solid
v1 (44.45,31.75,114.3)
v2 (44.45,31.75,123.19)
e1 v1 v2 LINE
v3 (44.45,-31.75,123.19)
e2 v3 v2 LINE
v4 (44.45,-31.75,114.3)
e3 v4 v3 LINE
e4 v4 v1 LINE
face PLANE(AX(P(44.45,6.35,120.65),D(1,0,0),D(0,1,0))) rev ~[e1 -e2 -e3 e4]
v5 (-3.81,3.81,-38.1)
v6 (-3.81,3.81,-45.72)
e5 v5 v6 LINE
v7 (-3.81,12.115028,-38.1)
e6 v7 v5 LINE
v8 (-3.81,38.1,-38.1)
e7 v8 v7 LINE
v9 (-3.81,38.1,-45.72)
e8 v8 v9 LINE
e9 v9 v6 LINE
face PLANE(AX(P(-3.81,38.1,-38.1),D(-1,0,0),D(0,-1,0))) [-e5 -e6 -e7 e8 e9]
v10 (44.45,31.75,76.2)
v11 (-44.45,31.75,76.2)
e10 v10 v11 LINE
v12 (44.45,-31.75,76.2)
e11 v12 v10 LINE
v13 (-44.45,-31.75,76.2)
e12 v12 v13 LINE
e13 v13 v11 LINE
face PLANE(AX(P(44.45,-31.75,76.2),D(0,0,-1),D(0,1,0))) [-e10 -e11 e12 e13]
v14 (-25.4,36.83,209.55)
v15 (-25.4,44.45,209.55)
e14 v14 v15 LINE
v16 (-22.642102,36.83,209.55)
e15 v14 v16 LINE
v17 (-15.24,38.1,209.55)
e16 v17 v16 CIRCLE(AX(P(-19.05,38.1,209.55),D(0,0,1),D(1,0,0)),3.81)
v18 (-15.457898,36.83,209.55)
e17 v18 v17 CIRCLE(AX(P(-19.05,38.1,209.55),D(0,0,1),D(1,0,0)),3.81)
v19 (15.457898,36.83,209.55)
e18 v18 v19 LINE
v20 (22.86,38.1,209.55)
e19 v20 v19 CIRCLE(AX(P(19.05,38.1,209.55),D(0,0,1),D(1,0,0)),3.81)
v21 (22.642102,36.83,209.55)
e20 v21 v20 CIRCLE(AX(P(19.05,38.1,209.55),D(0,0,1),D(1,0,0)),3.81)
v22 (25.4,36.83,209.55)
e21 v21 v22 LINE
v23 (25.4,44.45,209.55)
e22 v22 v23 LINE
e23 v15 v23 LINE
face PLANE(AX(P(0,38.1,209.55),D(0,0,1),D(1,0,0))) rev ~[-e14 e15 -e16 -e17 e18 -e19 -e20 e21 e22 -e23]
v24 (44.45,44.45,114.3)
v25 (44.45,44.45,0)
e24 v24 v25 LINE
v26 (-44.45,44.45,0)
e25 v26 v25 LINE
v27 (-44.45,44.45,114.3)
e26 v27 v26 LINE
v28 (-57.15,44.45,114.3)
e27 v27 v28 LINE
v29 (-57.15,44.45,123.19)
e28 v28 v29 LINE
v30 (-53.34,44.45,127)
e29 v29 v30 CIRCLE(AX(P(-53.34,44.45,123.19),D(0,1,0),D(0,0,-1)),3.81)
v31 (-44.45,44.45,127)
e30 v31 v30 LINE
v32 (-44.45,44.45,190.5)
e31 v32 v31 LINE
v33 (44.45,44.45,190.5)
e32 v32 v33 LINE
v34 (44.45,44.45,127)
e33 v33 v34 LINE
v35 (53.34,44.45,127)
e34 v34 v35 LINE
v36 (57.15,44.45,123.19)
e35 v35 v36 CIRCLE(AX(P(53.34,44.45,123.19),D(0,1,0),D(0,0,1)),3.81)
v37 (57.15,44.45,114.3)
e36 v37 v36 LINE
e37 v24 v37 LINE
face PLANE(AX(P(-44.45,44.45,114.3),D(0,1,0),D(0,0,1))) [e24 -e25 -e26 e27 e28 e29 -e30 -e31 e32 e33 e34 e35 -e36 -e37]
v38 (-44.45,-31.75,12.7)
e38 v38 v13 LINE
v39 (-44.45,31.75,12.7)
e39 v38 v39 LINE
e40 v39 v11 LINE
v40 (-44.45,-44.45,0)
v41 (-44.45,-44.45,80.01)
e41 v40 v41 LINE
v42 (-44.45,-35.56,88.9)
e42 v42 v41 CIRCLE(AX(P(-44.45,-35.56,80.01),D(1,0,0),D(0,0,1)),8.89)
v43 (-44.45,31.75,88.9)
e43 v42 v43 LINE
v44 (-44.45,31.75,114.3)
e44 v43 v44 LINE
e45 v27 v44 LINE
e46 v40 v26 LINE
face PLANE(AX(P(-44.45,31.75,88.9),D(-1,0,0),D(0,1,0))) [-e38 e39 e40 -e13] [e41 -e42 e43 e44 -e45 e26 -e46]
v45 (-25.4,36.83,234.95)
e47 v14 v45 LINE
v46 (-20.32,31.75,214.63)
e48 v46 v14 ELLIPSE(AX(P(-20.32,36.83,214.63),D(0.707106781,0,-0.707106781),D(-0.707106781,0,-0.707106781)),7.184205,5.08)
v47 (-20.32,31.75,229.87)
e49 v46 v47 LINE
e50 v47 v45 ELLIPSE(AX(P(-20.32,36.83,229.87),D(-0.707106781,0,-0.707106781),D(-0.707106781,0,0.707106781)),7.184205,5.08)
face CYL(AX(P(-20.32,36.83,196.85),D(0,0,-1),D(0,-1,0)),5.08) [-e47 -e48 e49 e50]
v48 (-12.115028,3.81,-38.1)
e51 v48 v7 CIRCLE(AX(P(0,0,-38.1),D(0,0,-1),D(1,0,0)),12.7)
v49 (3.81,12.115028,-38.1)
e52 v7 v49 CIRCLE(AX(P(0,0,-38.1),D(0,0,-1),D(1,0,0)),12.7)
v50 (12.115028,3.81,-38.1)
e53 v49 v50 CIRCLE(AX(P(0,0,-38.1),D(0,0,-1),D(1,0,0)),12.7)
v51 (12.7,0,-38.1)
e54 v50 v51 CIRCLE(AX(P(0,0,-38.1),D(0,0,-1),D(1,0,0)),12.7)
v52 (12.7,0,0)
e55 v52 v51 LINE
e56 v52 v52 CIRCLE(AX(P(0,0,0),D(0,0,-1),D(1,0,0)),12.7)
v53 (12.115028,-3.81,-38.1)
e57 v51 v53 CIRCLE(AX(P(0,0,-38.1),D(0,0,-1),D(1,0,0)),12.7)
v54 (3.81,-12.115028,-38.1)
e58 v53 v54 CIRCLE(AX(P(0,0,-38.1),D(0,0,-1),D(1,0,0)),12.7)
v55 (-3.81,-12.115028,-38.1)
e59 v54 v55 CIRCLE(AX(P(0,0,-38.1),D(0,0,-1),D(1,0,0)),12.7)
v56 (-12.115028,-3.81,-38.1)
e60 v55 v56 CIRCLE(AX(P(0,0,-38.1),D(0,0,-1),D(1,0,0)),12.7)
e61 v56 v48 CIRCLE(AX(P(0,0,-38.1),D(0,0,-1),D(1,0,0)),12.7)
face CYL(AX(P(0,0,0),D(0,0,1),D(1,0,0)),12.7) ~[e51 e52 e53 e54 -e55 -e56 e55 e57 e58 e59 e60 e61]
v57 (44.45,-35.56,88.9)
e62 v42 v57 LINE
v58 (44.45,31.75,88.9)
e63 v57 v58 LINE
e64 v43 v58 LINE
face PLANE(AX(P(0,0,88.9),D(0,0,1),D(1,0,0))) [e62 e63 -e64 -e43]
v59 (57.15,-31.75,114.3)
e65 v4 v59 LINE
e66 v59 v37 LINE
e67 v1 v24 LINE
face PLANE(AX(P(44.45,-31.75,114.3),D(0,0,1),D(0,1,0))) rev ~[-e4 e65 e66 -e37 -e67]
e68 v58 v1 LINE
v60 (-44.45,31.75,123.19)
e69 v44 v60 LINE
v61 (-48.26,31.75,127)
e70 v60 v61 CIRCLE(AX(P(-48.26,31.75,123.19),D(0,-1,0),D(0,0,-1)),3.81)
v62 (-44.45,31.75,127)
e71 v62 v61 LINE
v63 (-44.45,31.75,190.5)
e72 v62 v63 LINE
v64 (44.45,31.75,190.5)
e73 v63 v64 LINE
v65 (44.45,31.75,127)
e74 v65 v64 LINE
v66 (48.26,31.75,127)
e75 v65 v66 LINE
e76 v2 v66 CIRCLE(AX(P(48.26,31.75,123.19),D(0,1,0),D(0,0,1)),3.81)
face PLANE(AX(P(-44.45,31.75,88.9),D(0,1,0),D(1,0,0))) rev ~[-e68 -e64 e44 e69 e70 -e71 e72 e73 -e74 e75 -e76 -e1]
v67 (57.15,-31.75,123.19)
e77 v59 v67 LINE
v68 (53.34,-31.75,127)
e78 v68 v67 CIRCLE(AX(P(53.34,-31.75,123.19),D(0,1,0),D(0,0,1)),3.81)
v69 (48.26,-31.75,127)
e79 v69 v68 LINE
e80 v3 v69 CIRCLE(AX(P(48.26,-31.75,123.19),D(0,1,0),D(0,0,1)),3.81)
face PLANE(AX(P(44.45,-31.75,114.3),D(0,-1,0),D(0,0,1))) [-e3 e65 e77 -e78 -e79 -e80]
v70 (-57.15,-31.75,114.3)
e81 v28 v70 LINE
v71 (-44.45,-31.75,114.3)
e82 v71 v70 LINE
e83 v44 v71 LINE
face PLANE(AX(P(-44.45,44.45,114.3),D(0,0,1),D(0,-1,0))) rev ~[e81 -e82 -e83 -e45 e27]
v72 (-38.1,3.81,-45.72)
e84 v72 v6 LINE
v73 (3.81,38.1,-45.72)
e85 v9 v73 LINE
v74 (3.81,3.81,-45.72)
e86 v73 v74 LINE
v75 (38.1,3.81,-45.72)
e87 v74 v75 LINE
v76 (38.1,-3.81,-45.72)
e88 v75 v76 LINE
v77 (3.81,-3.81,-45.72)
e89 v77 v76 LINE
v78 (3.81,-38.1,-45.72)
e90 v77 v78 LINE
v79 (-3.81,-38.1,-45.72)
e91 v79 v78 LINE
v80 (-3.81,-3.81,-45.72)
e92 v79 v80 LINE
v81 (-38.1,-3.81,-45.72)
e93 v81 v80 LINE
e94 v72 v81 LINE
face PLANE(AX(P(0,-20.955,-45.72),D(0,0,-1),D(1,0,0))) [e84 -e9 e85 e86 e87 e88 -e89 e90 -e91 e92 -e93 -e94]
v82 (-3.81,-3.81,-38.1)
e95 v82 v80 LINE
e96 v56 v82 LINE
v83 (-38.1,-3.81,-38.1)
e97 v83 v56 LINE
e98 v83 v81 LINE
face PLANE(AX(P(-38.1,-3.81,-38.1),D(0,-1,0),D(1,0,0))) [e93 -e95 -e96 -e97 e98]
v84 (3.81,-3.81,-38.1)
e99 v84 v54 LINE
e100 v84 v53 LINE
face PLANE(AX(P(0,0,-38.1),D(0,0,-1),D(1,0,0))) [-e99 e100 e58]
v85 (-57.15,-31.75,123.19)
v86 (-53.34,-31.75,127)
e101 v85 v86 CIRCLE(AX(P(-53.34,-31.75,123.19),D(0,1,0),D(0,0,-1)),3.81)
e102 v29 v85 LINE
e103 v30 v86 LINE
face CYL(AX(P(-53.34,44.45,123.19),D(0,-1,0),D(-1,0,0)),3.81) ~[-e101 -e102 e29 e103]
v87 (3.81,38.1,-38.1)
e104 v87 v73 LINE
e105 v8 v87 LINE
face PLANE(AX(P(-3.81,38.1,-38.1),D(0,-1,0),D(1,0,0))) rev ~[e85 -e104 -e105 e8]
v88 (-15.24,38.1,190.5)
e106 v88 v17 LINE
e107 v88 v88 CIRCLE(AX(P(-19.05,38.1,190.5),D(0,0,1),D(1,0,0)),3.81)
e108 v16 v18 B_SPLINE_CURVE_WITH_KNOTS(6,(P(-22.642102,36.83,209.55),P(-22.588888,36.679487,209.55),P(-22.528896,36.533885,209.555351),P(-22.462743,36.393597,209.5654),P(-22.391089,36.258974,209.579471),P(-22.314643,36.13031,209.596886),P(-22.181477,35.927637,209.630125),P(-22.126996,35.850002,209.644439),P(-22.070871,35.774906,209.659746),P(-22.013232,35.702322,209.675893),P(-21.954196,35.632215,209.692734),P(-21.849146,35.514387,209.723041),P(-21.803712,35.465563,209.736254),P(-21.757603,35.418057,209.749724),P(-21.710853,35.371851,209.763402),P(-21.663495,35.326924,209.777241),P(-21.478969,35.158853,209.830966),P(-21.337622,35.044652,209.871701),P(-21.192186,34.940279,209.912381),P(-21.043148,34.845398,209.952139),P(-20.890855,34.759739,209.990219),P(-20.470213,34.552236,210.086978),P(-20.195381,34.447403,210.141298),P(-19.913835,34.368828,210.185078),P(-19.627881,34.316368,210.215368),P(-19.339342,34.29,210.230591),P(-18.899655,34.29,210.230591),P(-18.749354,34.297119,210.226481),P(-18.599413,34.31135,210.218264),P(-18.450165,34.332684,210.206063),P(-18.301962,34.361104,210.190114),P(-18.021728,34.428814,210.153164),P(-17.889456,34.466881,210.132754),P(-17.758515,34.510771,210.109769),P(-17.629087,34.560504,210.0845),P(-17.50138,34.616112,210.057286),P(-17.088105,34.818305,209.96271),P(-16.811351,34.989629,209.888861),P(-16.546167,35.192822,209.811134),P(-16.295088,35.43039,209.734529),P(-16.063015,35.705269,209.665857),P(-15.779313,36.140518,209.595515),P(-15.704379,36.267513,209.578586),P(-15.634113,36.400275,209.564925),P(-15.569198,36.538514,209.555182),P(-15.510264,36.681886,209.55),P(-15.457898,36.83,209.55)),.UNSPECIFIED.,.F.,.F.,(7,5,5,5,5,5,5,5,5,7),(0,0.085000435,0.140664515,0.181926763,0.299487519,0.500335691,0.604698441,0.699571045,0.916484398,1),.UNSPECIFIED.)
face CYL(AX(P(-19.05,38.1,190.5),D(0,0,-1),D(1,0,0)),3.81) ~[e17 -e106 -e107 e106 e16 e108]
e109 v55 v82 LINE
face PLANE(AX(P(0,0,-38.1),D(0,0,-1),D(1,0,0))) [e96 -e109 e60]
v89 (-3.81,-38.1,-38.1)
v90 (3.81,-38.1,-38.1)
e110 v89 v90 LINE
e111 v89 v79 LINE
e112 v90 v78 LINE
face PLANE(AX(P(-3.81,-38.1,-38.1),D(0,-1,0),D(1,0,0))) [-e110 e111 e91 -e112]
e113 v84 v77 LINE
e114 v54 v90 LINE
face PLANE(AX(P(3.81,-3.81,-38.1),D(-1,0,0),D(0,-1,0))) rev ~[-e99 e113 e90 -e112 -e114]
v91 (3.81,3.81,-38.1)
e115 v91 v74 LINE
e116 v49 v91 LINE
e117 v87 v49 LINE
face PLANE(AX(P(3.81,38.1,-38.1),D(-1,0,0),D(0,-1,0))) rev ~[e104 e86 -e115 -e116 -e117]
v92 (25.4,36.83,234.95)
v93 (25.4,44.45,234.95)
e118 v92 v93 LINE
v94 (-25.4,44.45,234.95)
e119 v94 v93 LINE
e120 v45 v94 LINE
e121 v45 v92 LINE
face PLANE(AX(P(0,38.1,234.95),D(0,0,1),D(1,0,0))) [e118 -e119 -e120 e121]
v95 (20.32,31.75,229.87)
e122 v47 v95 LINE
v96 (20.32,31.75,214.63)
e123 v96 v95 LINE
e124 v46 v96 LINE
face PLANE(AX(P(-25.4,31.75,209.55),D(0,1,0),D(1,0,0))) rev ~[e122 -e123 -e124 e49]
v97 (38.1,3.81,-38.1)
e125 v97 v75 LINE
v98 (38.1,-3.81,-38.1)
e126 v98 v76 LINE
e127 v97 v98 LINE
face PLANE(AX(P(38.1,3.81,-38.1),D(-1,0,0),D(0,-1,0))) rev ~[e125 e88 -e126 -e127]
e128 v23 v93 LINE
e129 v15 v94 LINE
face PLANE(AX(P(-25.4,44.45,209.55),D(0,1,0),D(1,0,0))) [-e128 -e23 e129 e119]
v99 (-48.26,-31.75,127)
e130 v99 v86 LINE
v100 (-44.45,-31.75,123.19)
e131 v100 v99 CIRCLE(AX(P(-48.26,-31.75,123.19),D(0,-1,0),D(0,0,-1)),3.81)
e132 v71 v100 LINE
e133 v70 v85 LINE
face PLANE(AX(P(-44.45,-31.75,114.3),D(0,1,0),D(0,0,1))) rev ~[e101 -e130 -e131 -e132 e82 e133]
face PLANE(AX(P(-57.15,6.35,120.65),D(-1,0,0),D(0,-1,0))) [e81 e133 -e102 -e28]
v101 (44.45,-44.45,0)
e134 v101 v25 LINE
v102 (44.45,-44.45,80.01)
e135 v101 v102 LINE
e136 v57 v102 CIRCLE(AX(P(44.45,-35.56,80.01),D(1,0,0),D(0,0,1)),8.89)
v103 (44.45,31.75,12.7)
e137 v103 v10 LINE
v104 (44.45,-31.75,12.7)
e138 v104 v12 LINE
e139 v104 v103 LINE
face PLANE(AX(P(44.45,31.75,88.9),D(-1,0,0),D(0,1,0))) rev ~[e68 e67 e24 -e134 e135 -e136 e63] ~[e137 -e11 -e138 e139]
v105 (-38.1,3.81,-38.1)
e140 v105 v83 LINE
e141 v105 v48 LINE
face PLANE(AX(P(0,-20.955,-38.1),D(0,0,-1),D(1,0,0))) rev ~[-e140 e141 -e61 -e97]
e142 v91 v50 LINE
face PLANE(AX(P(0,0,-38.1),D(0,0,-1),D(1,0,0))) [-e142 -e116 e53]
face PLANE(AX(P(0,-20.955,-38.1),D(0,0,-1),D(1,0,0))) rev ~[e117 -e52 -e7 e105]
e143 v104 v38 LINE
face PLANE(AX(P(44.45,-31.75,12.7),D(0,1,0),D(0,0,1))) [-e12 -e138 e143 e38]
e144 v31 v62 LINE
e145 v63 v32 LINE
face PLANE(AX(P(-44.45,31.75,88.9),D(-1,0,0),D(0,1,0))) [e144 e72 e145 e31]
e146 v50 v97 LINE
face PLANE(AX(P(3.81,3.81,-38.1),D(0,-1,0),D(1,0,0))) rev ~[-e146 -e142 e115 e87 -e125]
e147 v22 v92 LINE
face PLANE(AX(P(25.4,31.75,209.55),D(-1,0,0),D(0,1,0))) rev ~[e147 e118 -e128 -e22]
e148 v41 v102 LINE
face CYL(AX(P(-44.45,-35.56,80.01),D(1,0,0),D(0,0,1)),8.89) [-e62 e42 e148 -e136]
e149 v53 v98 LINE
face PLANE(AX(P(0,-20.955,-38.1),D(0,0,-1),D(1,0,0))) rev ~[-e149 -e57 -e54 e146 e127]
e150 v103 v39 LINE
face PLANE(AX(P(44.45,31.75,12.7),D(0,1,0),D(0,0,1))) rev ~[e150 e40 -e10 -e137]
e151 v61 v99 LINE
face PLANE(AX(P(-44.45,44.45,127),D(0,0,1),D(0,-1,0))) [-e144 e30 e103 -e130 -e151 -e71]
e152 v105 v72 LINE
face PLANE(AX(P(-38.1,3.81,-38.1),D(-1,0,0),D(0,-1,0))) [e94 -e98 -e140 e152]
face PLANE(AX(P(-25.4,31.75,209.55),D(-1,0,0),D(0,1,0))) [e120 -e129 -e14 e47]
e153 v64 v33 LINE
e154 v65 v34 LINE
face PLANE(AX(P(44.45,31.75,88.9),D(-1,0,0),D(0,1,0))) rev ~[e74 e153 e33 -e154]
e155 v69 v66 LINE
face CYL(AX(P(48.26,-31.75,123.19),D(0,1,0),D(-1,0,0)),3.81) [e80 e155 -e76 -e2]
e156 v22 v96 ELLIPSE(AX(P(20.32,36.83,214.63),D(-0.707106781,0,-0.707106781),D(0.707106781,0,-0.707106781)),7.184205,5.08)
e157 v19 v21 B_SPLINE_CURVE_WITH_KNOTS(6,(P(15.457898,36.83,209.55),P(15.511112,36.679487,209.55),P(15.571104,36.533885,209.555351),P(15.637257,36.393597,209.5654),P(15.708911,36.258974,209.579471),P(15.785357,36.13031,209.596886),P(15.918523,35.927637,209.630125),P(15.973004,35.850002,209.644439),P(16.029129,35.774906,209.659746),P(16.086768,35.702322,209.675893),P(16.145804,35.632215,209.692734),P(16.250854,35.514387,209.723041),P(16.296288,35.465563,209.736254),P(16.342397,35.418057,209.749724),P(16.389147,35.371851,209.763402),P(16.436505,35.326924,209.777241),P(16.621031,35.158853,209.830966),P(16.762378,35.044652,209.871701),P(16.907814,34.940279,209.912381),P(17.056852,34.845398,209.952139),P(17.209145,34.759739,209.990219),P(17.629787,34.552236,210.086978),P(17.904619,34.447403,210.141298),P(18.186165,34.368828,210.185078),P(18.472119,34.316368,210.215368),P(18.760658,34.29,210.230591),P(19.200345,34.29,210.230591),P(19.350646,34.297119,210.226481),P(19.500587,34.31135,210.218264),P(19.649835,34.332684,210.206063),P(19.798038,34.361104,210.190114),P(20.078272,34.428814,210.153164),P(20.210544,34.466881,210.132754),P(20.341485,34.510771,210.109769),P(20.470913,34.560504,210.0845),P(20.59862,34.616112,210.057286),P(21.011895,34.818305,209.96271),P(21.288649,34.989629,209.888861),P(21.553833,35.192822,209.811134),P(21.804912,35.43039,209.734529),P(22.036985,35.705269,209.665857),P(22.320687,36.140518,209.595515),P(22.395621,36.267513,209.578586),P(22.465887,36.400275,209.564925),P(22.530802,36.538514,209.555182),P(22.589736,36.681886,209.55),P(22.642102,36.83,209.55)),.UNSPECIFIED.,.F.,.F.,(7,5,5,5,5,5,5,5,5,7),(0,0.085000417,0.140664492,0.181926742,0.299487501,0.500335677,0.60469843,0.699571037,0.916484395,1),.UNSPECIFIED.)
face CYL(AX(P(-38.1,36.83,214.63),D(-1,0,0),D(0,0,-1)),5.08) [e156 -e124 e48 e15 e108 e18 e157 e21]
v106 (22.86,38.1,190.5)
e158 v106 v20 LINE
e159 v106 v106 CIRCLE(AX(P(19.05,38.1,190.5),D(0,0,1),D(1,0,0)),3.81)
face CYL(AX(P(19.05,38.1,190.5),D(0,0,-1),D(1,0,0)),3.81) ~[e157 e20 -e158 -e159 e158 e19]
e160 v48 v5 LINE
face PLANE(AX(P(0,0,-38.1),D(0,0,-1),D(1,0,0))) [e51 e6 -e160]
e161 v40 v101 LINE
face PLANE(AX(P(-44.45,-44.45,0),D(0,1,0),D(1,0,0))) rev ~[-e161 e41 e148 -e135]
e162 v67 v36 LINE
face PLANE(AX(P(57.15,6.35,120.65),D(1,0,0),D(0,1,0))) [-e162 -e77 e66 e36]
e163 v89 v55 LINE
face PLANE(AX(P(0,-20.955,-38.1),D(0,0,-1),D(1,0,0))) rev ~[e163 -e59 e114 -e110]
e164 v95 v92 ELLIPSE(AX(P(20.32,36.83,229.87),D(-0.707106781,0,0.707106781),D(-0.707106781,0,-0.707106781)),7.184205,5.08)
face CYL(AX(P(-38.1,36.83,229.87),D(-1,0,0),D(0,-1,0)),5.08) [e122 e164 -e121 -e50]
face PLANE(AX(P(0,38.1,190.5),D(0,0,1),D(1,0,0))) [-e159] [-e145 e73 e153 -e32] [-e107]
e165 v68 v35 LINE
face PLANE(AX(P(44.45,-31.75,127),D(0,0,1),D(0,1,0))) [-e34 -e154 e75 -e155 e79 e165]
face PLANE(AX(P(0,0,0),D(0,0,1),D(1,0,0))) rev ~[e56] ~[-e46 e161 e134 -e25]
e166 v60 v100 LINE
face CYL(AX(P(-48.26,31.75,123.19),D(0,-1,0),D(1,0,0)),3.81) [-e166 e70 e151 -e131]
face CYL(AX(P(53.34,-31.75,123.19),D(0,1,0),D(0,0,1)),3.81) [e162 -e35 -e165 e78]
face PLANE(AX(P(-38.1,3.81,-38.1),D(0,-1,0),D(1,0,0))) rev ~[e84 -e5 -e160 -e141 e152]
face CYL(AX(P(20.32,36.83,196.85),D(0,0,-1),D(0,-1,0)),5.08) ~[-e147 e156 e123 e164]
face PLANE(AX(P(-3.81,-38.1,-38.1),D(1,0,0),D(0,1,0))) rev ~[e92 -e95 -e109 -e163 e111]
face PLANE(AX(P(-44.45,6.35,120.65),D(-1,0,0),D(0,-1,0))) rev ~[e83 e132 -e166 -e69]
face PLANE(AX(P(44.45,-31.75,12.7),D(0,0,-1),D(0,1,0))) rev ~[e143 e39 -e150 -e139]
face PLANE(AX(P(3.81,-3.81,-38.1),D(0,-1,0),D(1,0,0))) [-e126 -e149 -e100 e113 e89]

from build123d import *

# Parameters (mm, degrees)
F0_W          = 88.9
F0_H          = 88.9
F1_DEPTH      = 88.9
F2_W          = 63.5
F2_H          = 63.5
F3_DEPTH      = 88.9
F4_W          = 88.9
F4_H          = 12.7
F5_DEPTH      = 101.6
F6_R          = 12.7
F7_DEPTH      = 38.1
F8_W          = 7.62
F8_H          = 34.29
F8_H_2        = 7.62
F8_W_2        = 34.29
F9_DEPTH      = 7.62
F10_W         = 76.2
F10_H         = 12.7
F11_DEPTH     = 12.7
F12_W         = 76.2
F12_H         = 12.7
F13_DEPTH     = 12.7
F14_R         = 3.81
F15_DEPTH     = 19.05
F16_W         = 50.8
F16_H         = 12.7
F17_DEPTH     = 25.4
F18_R         = 8.89
F19_T1_DEPTH  = 76.2
F19_T3_DEPTH  = 50.8
F19_T8_DEPTH  = 76.2
F19_S9_R      = 3.81
F19_T10_DEPTH = 40
F19_S11_R     = 3.81
F19_T12_DEPTH = 40
F20_R         = 3.81


# Not quite as in the source:
# - a fillet or chamfer that OpenCascade refuses, or shapes differently, is made with other operations: its cross-section is extruded or revolved along the edge and cut away or added


with BuildPart() as f1:
    # F0 (on Top) → F1 (new body)
    with BuildSketch(Plane.XY):
        Rectangle(F0_W, F0_H)
    extrude(amount=F1_DEPTH)

    # F2 (on face) → F3 (cut)
    with BuildSketch(Plane.YZ.offset(44.45)):
        with Locations((0, 44.45)):
            Rectangle(F2_W, F2_H)
    extrude(amount=-F3_DEPTH, mode=Mode.SUBTRACT)

    # F4 (on face) → F5 (join)
    with BuildSketch(Plane.XY.offset(88.9)):
        with Locations((0, 38.1)):
            Rectangle(F4_W, F4_H)
    extrude(amount=F5_DEPTH)

    # F6 (on face) → F7 (join)
    with BuildSketch(Plane(origin=(0, 0, 0), x_dir=(1, 0, 0), z_dir=(0, 0, -1))):
        Circle(F6_R)
    extrude(amount=F7_DEPTH)

    # F8 (on face) → F9 (join)
    with BuildSketch(Plane(origin=(0, 0, -38.1), x_dir=(1, 0, 0), z_dir=(0, 0, -1))):
        with Locations((0, 20.955)):
            Rectangle(F8_W, F8_H)
        Rectangle(F8_W, F8_H_2)
        with Locations((-20.955, 0)):
            Rectangle(F8_W_2, F8_H_2)
        with Locations((20.955, 0)):
            Rectangle(F8_W_2, F8_H_2)
        with Locations((0, -20.955)):
            Rectangle(F8_W, F8_H)
    extrude(amount=F9_DEPTH)

    # F10 (on face) → F11 (join)
    with BuildSketch(Plane.YZ.offset(44.45)):
        with Locations((6.35, 120.65)):
            Rectangle(F10_W, F10_H)
    extrude(amount=F11_DEPTH)

    # F12 (on face) → F13 (join)
    with BuildSketch(Plane(origin=(-44.45, 0, 0), x_dir=(0, -1, 0), z_dir=(-1, 0, 0))):
        with Locations((-6.35, 120.65)):
            Rectangle(F12_W, F12_H)
    extrude(amount=F13_DEPTH)

    # F14 (on face) → F15 (join)
    with BuildSketch(Plane.XY.offset(190.5)):
        with Locations((19.05, 38.1)):
            Circle(F14_R)
        with Locations((-19.05, 38.1)):
            Circle(F14_R)
    extrude(amount=F15_DEPTH)

    # F16 (on face) → F17 (join)
    with BuildSketch(Plane.XY.offset(209.55)):
        with Locations((0, 38.1)):
            Rectangle(F16_W, F16_H)
    extrude(amount=F17_DEPTH)

    # F18
    f18_edges = [f1.edges().sort_by_distance(p)[0] for p in [
        (0, -44.45, 88.9),
    ]]
    fillet(f18_edges, radius=F18_R)

    # F19: fillet of radius 5.08 on 4 edges, made by hand

    # F19_s2 → F19_t1 (cut)
    with BuildSketch(Plane.YZ.offset(-38.1)):
        with BuildLine():
            ThreePointArc((31.75, 229.87), (33.2378975516, 233.4621024484), (36.83, 234.95))
            Line((36.83, 234.95), (31.75, 234.95))
            Line((31.75, 234.95), (31.75, 229.87))
        make_face()
    extrude(amount=F19_T1_DEPTH, mode=Mode.SUBTRACT)

    # F19_s4 → F19_t3 (cut)
    with BuildSketch(Plane.XY.offset(196.85)):
        with BuildLine():
            ThreePointArc((20.32, 31.75), (23.9121024484, 33.2378975516), (25.4, 36.83))
            Line((25.4, 36.83), (25.4, 31.75))
            Line((25.4, 31.75), (20.32, 31.75))
        make_face()
        with BuildLine():
            ThreePointArc((-20.32, 31.75), (-23.9121024484, 33.2378975516), (-25.4, 36.83))
            Line((-25.4, 36.83), (-25.4, 31.75))
            Line((-25.4, 31.75), (-20.32, 31.75))
        make_face()
    extrude(amount=F19_T3_DEPTH, mode=Mode.SUBTRACT)


with BuildPart() as f19_tool6:
    # F19_s7 → F19_t8 (new body)
    with BuildSketch(Plane.YZ.offset(-38.1)):
        with BuildLine():
            ThreePointArc((36.83, 209.55), (33.2378975516, 211.0378975516), (31.75, 214.63))
            Line((31.75, 214.63), (31.75, 209.55))
            Line((31.75, 209.55), (36.83, 209.55))
        make_face()
    extrude(amount=F19_T8_DEPTH)

    # F19_s9 → F19_t10 (cut, symmetric)
    with BuildSketch(Plane.XY.offset(212.1)):
        with Locations((-19.05, 38.1)):
            Circle(F19_S9_R)
    extrude(amount=F19_T10_DEPTH, both=True, mode=Mode.SUBTRACT)

    # F19_s11 → F19_t12 (cut, symmetric)
    with BuildSketch(Plane.XY.offset(212.1)):
        with Locations((19.05, 38.1)):
            Circle(F19_S11_R)
    extrude(amount=F19_T12_DEPTH, both=True, mode=Mode.SUBTRACT)


with BuildPart() as f1_1:
    add(f1.part)

    # F19_t5: cut F19_tool6
    add(f19_tool6.part, mode=Mode.SUBTRACT)

    # F20
    f20_edges = [f1_1.edges().sort_by_distance(p)[0] for p in [
        (44.45, 0, 127),
        (57.15, 6.35, 127),
        (-44.45, 0, 127),
        (-57.15, 6.35, 127),
    ]]
    fillet(f20_edges, radius=F20_R)


solid = f1_1.part
